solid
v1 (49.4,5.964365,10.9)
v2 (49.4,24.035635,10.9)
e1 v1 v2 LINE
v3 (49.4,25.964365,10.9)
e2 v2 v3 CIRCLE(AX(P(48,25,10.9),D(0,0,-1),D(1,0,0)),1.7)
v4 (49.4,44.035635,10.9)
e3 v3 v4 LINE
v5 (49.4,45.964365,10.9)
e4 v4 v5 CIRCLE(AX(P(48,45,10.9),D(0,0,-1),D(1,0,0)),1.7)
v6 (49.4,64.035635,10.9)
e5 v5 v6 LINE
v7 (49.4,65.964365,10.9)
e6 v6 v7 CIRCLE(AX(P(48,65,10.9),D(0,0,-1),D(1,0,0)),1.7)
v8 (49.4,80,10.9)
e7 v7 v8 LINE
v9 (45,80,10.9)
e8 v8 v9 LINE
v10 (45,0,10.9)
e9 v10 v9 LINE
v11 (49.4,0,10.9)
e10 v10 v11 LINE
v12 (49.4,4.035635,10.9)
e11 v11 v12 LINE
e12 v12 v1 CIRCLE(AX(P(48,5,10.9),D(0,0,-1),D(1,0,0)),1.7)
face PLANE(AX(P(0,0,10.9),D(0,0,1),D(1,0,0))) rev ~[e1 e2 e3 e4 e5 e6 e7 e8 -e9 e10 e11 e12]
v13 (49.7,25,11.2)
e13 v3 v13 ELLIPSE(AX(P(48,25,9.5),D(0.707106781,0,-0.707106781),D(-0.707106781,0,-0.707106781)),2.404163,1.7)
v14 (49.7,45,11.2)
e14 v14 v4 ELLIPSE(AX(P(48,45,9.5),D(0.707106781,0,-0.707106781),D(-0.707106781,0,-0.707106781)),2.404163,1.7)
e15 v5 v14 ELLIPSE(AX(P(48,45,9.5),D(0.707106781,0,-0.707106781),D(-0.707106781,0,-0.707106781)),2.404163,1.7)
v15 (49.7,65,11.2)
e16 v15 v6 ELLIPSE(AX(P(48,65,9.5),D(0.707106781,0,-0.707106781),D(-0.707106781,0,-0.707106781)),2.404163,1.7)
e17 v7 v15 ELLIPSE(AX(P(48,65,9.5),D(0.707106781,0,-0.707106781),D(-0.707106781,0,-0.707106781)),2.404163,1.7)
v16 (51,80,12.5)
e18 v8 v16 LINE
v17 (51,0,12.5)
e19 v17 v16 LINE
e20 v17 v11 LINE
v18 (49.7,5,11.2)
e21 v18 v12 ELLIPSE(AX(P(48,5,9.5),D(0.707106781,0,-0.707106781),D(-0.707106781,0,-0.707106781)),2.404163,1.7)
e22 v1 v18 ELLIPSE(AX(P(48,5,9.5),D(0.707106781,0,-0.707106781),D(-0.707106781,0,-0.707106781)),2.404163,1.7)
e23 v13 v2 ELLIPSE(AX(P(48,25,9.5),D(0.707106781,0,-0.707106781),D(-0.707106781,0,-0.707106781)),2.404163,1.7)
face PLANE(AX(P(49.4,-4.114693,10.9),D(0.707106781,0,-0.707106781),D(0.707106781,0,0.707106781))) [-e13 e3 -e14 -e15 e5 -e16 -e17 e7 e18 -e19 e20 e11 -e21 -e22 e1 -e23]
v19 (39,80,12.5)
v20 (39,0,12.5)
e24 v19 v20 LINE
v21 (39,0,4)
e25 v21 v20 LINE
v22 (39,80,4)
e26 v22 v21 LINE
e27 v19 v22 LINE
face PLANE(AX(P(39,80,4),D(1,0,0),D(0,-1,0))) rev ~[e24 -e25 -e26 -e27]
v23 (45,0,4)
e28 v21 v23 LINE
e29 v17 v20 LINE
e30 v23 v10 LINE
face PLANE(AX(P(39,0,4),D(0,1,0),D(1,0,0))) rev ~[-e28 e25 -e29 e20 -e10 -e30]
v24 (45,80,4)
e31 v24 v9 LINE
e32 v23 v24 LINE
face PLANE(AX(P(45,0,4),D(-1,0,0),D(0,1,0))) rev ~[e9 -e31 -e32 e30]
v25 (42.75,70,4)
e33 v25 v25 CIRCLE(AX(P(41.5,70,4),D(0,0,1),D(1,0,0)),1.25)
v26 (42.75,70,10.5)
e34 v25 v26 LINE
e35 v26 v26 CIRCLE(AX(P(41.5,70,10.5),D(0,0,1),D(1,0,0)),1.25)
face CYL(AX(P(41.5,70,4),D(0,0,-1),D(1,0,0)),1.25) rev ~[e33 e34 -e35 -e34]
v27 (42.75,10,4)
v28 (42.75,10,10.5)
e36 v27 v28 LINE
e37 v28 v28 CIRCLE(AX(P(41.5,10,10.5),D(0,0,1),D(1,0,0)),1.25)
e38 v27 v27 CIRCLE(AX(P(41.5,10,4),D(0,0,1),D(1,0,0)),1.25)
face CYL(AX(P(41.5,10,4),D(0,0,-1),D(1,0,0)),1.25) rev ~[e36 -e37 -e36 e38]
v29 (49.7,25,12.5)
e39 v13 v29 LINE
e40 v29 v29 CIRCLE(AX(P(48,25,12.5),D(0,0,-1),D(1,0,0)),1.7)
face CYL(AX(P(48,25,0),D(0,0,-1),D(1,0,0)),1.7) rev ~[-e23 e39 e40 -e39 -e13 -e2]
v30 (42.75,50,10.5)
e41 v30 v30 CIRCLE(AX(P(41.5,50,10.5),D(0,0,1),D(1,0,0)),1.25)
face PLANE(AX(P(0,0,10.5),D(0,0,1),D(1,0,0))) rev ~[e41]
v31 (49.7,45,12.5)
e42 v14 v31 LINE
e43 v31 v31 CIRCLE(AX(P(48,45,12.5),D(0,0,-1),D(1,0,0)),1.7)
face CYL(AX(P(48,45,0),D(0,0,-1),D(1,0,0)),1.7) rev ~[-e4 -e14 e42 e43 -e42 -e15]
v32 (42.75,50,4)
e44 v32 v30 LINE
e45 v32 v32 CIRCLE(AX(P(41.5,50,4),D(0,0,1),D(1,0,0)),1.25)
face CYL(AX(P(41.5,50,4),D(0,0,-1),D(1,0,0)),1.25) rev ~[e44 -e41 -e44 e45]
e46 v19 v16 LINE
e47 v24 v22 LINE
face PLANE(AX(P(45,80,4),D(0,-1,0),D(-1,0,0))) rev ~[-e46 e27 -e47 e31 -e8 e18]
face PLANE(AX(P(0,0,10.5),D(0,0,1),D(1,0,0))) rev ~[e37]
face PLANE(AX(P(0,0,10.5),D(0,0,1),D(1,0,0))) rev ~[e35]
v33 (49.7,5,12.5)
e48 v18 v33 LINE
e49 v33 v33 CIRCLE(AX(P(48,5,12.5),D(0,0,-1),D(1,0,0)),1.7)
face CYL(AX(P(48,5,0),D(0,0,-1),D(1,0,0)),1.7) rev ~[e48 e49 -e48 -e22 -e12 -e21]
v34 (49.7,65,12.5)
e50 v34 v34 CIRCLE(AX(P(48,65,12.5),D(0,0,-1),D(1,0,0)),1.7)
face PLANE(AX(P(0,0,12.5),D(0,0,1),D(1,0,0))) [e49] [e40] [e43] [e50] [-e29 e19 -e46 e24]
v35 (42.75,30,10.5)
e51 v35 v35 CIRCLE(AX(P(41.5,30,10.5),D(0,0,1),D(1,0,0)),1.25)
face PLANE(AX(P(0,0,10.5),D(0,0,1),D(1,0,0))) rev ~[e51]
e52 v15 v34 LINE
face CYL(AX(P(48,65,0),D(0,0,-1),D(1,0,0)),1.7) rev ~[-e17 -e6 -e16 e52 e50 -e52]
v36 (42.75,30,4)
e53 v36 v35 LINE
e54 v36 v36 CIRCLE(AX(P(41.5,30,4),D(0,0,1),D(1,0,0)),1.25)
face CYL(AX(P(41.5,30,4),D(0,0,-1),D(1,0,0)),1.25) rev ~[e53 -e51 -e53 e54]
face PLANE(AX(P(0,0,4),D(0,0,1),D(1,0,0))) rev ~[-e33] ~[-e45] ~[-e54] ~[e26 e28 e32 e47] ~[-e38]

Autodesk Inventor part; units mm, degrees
ref_plane "Right_Connecting_Web_StartPlane" through (0, 0, 4) normal (0, 0, 1) x (1, 0, 0)
sketch "Right_Connecting_Web_Profile" plane through (0, 0, 4) normal (0, 0, 1) x (1, 0, 0)
  line L0 (39, 0) -> (45, 0)
  line L1 (45, 0) -> (45, 80)
  line L2 (45, 80) -> (39, 80)
  line L3 (39, 80) -> (39, 0)
  point P0 (0, 0)
  dimension "d1" = 39
  dimension "d2" = 6
  dimension "d3" = 80
extrude "Right_Connecting_Web" add sketch "Right_Connecting_Web_Profile" along normal blind 8.5
ref_plane "Right_Rod_Contact_Flange_StartPlane" through (0, 0, 10.9) normal (0, 0, 1) x (1, 0, 0)
sketch "Right_Rod_Contact_Flange_Profile" plane through (0, 0, 10.9) normal (0, 0, 1) x (1, 0, 0)
  line L0 (39, 0) -> (51, 0)
  line L1 (51, 0) -> (51, 80)
  line L2 (51, 80) -> (39, 80)
  line L3 (39, 80) -> (39, 0)
  point P0 (0, 0)
  dimension "d7" = 39
  dimension "d8" = 12
  dimension "d9" = 80
extrude "Right_Rod_Contact_Flange" add sketch "Right_Rod_Contact_Flange_Profile" along normal blind 1.6
sketch "Original_Rod_Clearance_4x_Locations" plane through (0, 0, 0) normal (0, 0, 1) x (1, 0, 0)
  circle A0 centre (48, 5) radius 1.7
  circle A1 centre (48, 25) radius 1.7
  circle A2 centre (48, 45) radius 1.7
  circle A3 centre (48, 65) radius 1.7
  point P0 (0, 0)
  dimension "d12" = 48
  dimension "d13" = 5
  dimension "d14" = 3.4
  dimension "d15" = 48
  dimension "d16" = 25
  dimension "d17" = 3.4
  dimension "d18" = 48
  dimension "d19" = 45
  dimension "d20" = 3.4
  dimension "d21" = 48
  dimension "d22" = 65
  dimension "d23" = 3.4
extrude "Original_Rod_Clearance_4x" cut sketch "Original_Rod_Clearance_4x_Locations" along normal through all
ref_plane "Work Plane3" through (0, 0, 4) normal (0, 0, 1) x (1, 0, 0)
sketch "Deck_Assembly_M3_Locations" plane through (0, 0, 4) normal (0, 0, 1) x (1, 0, 0)
  circle A0 centre (41.5, 10) radius 1.25
  circle A1 centre (41.5, 30) radius 1.25
  circle A2 centre (41.5, 50) radius 1.25
  circle A3 centre (41.5, 70) radius 1.25
  point P0 (0, 0)
  dimension "d27" = 41.5
  dimension "d28" = 10
  dimension "d29" = 2.5
  dimension "d30" = 41.5
  dimension "d31" = 30
  dimension "d32" = 2.5
  dimension "d33" = 41.5
  dimension "d34" = 50
  dimension "d35" = 2.5
  dimension "d36" = 41.5
  dimension "d37" = 70
  dimension "d38" = 2.5
extrude "Four_Blind_M3_Tap_Bores" cut sketch "Deck_Assembly_M3_Locations" along normal blind 6.5
thread "Deck_M3x0_5_6H_1" size "M3x0.5" class "6H" standard "ISO Metric profile" length 6.5
thread "Deck_M3x0_5_6H_2" size "M3x0.5" class "6H" standard "ISO Metric profile" length 6.5
thread "Deck_M3x0_5_6H_3" size "M3x0.5" class "6H" standard "ISO Metric profile" length 6.5
thread "Deck_M3x0_5_6H_4" size "M3x0.5" class "6H" standard "ISO Metric profile" length 6.5
chamfer "Outer_End_1p6mm_45deg" distance 1.6 angle 45 1 edges at (51, 40, 10.9)
equation "\"d1\" = -RodWidth + OverallWidth - WebThickness"
equation "\"d2\" = WebThickness"
equation "\"d3\" = ContactLength"
equation "\"d4\" = DropHeight"
equation "\"d7\" = -RodWidth + OverallWidth - WebThickness"
equation "\"d8\" = RodWidth + WebThickness"
equation "\"d9\" = ContactLength"
equation "\"d10\" = RodFlangeThickness"
equation "\"d12\" = OverallWidth - 0.5 * RodWidth"
equation "\"d13\" = RodHoleStart + 0 * RodScrewPitch"
equation "\"d14\" = RodClearanceDiameter"
equation "\"d15\" = OverallWidth - 0.5 * RodWidth"
equation "\"d16\" = RodHoleStart + RodScrewPitch"
equation "\"d17\" = RodClearanceDiameter"
equation "\"d18\" = OverallWidth - 0.5 * RodWidth"
equation "\"d19\" = RodHoleStart + 2 * RodScrewPitch"
equation "\"d20\" = RodClearanceDiameter"
equation "\"d21\" = OverallWidth - 0.5 * RodWidth"
equation "\"d22\" = RodHoleStart + 3 * RodScrewPitch"
equation "\"d23\" = RodClearanceDiameter"
equation "\"d27\" = OverallWidth - JoinLeftX"
equation "\"d28\" = JoinFirstY + 0 * JoinPitch"
equation "\"d29\" = TapDrillDiameter"
equation "\"d30\" = OverallWidth - JoinLeftX"
equation "\"d31\" = JoinFirstY + JoinPitch"
equation "\"d32\" = TapDrillDiameter"
equation "\"d33\" = OverallWidth - JoinLeftX"
equation "\"d34\" = JoinFirstY + 2 * JoinPitch"
equation "\"d35\" = TapDrillDiameter"
equation "\"d36\" = OverallWidth - JoinLeftX"
equation "\"d37\" = JoinFirstY + 3 * JoinPitch"
equation "\"d38\" = TapDrillDiameter"
equation "\"d39\" = JoinThreadDepth"
equation "\"d41\" = JoinThreadDepth"
equation "\"d43\" = JoinThreadDepth"
equation "\"d45\" = JoinThreadDepth"
equation "\"d47\" = JoinThreadDepth"
equation "\"d49\" = OuterEndChamfer"
equation "\"d50\" = OuterEndChamfer"
equation "\"OverallWidth\" = 51"
equation "\"RodWidth\" = 6"
equation "\"ContactLength\" = 80"
equation "\"BaseThickness\" = 4"
equation "\"DropHeight\" = 8.5"
equation "\"WebThickness\" = 6"
equation "\"FingerStartX\" = 19.93338"
equation "\"FingerWidth\" = 13.5"
equation "\"FingerThickness\" = 6"
equation "\"FingerEndInset\" = 4"
equation "\"RodClearanceDiameter\" = 3.4"
equation "\"ClampFirstY\" = 41.82802"
equation "\"ClampPitch\" = 16"
equation "\"ClampHeight\" = BaseThickness + 0.5 * FingerThickness"
equation "\"TapDrillDiameter\" = 2.5"
equation "\"TapDepth\" = 6"
equation "\"RodHoleStart\" = 5"
equation "\"RodScrewPitch\" = 20"
equation "\"JoinLeftX\" = 9.5"
equation "\"JoinFirstY\" = 10"
equation "\"JoinPitch\" = 20"
equation "\"JoinThreadDepth\" = 6.5"
equation "\"JoinCountersinkDiameter\" = 6.2"
equation "\"d0\" = BaseThickness"
equation "\"d6\" = BaseThickness + DropHeight - RodFlangeThickness"
equation "\"d26\" = BaseThickness"
equation "\"RodFlangeThickness\" = 1.6"
equation "\"OuterEndChamfer\" = RodFlangeThickness"
properties part number "Right_Rod_Support"
